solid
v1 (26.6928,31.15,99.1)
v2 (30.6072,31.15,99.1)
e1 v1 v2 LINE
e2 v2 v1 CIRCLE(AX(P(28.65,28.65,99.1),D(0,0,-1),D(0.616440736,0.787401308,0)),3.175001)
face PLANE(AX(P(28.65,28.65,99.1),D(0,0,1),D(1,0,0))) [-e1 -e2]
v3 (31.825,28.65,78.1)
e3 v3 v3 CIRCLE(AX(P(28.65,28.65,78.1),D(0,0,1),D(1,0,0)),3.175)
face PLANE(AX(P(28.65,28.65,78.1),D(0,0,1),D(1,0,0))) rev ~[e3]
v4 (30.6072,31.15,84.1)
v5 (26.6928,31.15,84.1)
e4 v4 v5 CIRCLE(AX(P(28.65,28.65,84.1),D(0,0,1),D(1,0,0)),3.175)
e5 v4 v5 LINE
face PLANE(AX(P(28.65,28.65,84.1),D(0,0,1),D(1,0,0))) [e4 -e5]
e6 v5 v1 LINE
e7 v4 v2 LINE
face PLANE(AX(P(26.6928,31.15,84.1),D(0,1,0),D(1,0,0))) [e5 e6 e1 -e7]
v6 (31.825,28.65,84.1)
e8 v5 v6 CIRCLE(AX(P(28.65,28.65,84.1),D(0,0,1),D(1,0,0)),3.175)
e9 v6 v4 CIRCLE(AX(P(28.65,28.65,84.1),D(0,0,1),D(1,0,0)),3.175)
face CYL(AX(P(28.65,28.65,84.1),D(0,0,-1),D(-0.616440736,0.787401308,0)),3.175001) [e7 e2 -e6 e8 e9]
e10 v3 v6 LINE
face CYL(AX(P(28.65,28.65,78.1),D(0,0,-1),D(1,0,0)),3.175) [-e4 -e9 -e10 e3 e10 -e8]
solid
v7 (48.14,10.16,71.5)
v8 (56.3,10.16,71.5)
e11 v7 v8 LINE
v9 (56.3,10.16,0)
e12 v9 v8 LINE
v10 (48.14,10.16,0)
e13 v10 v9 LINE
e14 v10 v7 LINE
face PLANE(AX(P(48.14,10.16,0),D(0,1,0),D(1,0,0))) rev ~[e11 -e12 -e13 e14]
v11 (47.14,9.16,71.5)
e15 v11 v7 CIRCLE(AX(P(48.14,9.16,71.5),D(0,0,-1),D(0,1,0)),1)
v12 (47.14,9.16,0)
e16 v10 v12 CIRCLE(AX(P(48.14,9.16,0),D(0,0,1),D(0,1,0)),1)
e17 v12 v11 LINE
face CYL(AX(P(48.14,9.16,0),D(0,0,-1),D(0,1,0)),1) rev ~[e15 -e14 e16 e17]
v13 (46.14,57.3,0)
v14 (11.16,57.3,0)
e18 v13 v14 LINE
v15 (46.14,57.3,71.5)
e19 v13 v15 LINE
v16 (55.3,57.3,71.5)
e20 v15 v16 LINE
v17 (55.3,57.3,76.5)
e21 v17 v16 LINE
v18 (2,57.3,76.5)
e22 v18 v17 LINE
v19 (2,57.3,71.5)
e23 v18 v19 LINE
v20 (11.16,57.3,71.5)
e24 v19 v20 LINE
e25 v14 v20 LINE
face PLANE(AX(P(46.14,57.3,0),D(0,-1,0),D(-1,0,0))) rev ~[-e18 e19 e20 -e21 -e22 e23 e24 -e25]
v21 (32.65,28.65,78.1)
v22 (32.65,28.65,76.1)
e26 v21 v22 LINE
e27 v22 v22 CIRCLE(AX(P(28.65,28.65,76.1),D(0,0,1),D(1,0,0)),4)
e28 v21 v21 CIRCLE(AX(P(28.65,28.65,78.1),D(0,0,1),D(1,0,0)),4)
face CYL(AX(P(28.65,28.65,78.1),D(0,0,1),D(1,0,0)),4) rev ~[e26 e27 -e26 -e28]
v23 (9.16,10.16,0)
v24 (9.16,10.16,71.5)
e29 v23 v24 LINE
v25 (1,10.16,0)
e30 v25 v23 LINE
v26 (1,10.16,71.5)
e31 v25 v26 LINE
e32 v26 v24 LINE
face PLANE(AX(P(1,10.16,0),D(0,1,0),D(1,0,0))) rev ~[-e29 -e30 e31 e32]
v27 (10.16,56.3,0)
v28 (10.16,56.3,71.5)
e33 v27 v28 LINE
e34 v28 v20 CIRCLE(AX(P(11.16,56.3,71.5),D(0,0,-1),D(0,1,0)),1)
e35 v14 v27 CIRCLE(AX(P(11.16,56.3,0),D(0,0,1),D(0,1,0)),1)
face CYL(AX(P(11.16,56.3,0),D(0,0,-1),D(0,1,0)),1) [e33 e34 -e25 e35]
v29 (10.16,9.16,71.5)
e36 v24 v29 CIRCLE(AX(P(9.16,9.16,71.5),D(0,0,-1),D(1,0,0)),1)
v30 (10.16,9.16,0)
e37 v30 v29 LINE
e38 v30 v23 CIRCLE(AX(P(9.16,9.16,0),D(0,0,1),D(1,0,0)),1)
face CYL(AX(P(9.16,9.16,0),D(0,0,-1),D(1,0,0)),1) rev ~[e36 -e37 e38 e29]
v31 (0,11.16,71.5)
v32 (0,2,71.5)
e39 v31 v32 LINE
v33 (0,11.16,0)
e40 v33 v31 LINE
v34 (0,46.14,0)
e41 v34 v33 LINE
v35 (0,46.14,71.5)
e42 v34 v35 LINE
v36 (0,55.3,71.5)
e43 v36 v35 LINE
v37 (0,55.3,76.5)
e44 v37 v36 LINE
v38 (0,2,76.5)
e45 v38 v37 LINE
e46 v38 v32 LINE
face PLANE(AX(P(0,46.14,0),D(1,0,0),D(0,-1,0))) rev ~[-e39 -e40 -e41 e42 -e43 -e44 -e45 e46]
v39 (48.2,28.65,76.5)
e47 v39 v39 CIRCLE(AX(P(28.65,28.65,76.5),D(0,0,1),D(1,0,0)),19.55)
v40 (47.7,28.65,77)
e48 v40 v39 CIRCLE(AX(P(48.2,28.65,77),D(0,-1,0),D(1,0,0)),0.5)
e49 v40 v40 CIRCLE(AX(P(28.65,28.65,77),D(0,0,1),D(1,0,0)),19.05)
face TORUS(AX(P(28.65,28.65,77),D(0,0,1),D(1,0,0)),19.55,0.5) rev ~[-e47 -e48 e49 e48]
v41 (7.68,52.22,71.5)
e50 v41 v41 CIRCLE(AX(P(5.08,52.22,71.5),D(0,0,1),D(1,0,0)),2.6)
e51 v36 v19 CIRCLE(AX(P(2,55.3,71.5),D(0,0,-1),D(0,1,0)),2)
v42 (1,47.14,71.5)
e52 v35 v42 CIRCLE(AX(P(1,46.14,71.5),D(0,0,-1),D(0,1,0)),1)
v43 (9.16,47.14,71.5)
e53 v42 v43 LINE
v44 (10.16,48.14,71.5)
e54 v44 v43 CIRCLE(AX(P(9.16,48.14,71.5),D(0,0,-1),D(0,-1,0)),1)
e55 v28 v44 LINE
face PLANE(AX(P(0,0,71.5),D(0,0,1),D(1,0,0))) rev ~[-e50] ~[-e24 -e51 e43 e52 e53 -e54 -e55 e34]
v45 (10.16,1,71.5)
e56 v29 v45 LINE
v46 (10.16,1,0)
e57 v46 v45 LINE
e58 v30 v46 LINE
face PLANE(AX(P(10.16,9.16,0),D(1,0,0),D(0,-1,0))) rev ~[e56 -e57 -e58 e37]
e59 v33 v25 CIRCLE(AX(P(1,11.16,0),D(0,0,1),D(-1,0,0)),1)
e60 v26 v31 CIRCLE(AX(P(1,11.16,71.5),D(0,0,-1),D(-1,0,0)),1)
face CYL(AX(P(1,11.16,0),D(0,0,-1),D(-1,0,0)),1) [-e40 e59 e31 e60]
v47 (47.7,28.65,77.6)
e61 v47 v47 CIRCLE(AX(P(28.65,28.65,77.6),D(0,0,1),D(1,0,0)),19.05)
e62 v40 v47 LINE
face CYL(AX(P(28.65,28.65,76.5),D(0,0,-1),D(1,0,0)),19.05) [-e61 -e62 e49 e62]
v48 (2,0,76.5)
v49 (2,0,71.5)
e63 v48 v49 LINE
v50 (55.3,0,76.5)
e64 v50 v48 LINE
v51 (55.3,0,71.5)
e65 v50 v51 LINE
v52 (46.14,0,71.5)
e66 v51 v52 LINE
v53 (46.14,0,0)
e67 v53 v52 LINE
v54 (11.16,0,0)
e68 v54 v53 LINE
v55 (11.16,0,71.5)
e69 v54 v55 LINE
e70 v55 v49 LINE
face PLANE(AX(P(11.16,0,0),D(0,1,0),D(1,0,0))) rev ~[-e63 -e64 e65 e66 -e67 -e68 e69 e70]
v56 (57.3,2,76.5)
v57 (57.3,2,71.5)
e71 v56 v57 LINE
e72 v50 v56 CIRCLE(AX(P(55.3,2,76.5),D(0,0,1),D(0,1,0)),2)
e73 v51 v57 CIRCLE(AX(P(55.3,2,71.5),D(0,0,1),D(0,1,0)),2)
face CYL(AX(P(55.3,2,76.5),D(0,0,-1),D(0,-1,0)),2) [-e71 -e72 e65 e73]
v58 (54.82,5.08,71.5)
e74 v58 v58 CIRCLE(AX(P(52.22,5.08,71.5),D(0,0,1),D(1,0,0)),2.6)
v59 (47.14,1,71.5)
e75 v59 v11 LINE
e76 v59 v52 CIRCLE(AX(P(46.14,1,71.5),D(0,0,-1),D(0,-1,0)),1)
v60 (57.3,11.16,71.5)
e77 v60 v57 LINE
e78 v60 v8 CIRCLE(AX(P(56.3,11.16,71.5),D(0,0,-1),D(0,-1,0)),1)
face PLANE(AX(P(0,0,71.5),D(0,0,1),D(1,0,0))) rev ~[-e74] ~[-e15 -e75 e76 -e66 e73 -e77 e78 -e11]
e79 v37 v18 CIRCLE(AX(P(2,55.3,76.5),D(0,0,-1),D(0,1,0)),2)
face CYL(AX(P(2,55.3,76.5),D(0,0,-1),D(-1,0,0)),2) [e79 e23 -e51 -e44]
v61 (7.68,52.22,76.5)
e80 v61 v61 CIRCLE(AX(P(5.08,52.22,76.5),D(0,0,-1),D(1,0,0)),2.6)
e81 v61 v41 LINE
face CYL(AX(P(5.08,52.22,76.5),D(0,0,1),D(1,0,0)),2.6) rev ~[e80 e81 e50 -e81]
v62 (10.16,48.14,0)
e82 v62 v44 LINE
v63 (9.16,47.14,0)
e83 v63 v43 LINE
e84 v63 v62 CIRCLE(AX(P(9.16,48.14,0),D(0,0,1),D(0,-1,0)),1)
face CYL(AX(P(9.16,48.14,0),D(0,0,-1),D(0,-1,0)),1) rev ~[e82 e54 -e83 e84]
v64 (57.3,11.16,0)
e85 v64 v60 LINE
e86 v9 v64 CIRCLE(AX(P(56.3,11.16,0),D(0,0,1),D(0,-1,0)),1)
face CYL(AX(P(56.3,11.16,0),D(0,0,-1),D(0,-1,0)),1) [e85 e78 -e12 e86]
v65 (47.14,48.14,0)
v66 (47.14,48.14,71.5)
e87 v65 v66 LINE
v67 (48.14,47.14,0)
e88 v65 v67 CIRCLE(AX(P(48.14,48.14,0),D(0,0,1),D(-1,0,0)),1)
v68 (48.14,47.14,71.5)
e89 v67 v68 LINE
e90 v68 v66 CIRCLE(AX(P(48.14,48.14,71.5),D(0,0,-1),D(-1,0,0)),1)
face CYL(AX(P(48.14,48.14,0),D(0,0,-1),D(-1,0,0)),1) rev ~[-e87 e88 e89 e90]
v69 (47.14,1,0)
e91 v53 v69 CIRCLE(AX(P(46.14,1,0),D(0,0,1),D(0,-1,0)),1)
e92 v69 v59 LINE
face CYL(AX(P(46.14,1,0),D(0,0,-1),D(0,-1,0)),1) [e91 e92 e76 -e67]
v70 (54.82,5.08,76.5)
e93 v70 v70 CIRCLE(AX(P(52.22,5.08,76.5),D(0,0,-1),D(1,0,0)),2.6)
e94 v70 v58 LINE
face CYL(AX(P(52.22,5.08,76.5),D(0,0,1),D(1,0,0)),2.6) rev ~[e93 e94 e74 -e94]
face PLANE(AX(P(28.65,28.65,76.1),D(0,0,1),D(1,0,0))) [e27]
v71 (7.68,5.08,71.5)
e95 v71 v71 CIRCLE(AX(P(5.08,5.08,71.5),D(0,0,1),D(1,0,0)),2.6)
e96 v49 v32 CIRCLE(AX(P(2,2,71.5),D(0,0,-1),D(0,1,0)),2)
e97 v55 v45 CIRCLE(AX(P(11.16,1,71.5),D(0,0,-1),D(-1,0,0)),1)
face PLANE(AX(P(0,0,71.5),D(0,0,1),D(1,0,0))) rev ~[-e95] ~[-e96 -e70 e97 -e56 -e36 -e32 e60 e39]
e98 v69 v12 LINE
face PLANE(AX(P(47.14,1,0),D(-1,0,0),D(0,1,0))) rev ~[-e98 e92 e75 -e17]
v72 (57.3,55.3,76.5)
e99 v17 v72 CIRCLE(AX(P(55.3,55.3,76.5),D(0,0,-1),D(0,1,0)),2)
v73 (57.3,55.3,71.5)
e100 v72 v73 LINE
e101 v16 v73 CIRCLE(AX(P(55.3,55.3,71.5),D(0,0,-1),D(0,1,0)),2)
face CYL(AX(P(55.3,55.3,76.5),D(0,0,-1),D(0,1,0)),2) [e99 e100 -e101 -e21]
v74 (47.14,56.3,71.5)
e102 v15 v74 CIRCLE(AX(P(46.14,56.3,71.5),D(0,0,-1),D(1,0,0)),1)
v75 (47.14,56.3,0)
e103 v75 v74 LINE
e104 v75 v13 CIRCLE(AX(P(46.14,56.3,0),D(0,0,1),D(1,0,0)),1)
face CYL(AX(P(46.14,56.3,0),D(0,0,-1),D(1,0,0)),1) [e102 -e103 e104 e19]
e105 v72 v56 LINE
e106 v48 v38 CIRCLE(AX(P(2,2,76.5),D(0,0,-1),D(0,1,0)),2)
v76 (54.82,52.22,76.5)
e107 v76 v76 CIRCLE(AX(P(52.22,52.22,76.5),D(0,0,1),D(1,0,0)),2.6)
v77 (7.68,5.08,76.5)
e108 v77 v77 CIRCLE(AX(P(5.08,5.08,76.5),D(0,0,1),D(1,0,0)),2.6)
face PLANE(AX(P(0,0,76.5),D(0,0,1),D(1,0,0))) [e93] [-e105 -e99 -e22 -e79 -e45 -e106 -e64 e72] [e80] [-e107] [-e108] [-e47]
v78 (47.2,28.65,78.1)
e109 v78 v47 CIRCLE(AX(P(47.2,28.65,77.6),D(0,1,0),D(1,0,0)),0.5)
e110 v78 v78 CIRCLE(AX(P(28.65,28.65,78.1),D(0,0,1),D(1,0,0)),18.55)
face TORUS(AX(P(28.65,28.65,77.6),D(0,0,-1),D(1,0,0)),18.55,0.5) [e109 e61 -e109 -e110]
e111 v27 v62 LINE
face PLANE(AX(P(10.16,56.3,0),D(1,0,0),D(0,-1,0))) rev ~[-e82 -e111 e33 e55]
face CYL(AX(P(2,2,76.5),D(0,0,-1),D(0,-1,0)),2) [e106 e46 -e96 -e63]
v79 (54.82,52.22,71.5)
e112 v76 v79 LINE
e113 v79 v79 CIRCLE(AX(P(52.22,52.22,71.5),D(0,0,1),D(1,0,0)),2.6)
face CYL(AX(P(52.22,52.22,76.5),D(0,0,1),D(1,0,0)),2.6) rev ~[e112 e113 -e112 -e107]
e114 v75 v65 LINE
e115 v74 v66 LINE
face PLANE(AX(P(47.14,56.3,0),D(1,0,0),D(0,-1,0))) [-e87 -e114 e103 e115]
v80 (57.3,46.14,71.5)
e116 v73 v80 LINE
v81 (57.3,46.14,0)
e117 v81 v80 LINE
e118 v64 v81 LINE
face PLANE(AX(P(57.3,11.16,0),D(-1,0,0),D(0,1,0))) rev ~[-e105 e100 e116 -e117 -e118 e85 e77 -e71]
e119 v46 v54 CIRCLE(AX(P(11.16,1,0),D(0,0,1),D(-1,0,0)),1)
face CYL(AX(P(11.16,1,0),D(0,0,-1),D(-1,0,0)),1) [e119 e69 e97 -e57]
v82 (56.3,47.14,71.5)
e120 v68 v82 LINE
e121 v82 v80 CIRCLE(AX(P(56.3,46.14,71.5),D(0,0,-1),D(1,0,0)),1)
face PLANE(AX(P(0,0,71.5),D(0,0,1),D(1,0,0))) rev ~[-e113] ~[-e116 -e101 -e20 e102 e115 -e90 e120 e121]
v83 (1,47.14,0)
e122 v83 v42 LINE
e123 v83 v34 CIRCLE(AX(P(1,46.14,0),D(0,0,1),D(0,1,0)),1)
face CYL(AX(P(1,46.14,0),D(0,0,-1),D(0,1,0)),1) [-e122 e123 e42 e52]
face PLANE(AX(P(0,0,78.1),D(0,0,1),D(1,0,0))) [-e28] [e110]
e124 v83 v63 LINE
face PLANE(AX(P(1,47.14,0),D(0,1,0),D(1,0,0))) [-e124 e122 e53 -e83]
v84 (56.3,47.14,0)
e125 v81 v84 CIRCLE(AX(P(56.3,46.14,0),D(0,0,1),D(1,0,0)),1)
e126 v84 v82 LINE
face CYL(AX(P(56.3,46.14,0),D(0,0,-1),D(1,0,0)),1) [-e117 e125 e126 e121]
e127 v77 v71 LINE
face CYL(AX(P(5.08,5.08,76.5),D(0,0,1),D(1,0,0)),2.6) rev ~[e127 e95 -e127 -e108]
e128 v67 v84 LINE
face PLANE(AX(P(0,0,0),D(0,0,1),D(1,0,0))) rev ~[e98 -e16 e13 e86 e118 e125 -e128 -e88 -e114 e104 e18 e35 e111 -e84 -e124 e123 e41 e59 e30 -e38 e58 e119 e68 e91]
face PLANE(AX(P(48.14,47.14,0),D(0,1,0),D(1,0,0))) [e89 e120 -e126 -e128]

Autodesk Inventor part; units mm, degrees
ref_plane "YZ Plane" through (0, 0, 0) normal (1, 0, 0) x (0, 1, 0)
ref_plane "XZ Plane" through (0, 0, 0) normal (0, 1, 0) x (-1, 0, 0)
ref_plane "XY Plane" through (0, 0, 0) normal (0, 0, 1) x (1, 0, 0)
sketch "Sketch1" plane through (0, 0, 0) normal (0, 0, 1) x (1, 0, 0)
  line L0 (11.16, 0) -> (46.14, 0)
  line L1 (57.3, 11.16) -> (57.3, 46.14)
  line L2 (46.14, 57.3) -> (11.16, 57.3)
  line L3 (0, 46.14) -> (0, 11.16)
  line L4 (0, 0) -> (0, 10.16)
  line L5 (1, 10.16) -> (9.16, 10.16)
  line L6 (10.16, 9.16) -> (10.16, 1)
  line L7 (57.3, 0) -> (47.14, 0)
  line L8 (47.14, 1) -> (47.14, 9.16)
  line L9 (48.14, 10.16) -> (56.3, 10.16)
  line L10 (47.14, 56.3) -> (47.14, 48.14)
  line L11 (48.14, 47.14) -> (56.3, 47.14)
  line L12 (10.16, 56.3) -> (10.16, 48.14)
  line L13 (1, 47.14) -> (9.16, 47.14)
  arc A0 (9.16, 47.14) -> (10.16, 48.14) centre (9.16, 48.14) ccw
  arc A1 (47.14, 48.14) -> (48.14, 47.14) centre (48.14, 48.14) ccw
  arc A2 (10.16, 9.16) -> (9.16, 10.16) centre (9.16, 9.16) ccw
  arc A3 (48.14, 10.16) -> (47.14, 9.16) centre (48.14, 9.16) ccw
  arc A4 (11.16, 57.3) -> (10.16, 56.3) centre (11.16, 56.3) ccw
  arc A5 (47.14, 56.3) -> (46.14, 57.3) centre (46.14, 56.3) ccw
  arc A6 (57.3, 46.14) -> (56.3, 47.14) centre (56.3, 46.14) ccw
  arc A7 (56.3, 10.16) -> (57.3, 11.16) centre (56.3, 11.16) ccw
  arc A8 (46.14, 0) -> (47.14, 1) centre (46.14, 1) ccw
  arc A9 (10.16, 1) -> (11.16, 0) centre (11.16, 1) ccw
  arc A10 (0, 11.16) -> (1, 10.16) centre (1, 11.16) ccw
  arc A11 (1, 47.14) -> (0, 46.14) centre (1, 46.14) ccw
  point P0 (57.3, 57.3)
  point P1 (0, 47.14)
  point P2 (10.16, 10.16)
  point P3 (47.14, 10.16)
  point P4 (47.14, 47.14)
  point P5 (10.16, 47.14)
  point P6 (10.16, 57.3)
  point P7 (47.14, 57.3)
  point P8 (57.3, 10.16)
  dimension "d25" = 57.3
  dimension "d26" = 57.3
  dimension "d27" = 10.16
  dimension "d28" = 10.16
  dimension "d29" = 10.16
  dimension "d30" = 10.16
  dimension "d31" = 1
extrude "Extrusion4" add sketch "Sketch1" along normal blind 76.5
sketch "Sketch4" plane through (0, 0, 76.5) normal (0, 0, 1) x (1, 0, 0)
  arc A0 (10.16, 1) -> (11.16, 0) centre (11.16, 1) ccw projected
  line L0 (11.16, 0) -> (46.14, 0) projected
  arc A1 (46.14, 0) -> (47.14, 1) centre (46.14, 1) ccw projected
  line L1 (47.14, 1) -> (47.14, 9.16) projected
  arc A2 (48.14, 10.16) -> (47.14, 9.16) centre (48.14, 9.16) ccw projected
  line L2 (48.14, 10.16) -> (56.3, 10.16) projected
  arc A3 (56.3, 10.16) -> (57.3, 11.16) centre (56.3, 11.16) ccw projected
  line L3 (57.3, 11.16) -> (57.3, 46.14) projected
  arc A4 (57.3, 46.14) -> (56.3, 47.14) centre (56.3, 46.14) ccw projected
  line L4 (56.3, 47.14) -> (48.14, 47.14) projected
  arc A5 (47.14, 48.14) -> (48.14, 47.14) centre (48.14, 48.14) ccw projected
  line L5 (47.14, 48.14) -> (47.14, 56.3) projected
  arc A6 (47.14, 56.3) -> (46.14, 57.3) centre (46.14, 56.3) ccw projected
  line L6 (46.14, 57.3) -> (11.16, 57.3) projected
  arc A7 (11.16, 57.3) -> (10.16, 56.3) centre (11.16, 56.3) ccw projected
  line L7 (10.16, 56.3) -> (10.16, 48.14) projected
  arc A8 (9.16, 47.14) -> (10.16, 48.14) centre (9.16, 48.14) ccw projected
  line L8 (9.16, 47.14) -> (1, 47.14) projected
  arc A9 (1, 47.14) -> (0, 46.14) centre (1, 46.14) ccw projected
  line L9 (0, 46.14) -> (0, 11.16) projected
  arc A10 (0, 11.16) -> (1, 10.16) centre (1, 11.16) ccw projected
  line L10 (1, 10.16) -> (9.16, 10.16) projected
  arc A11 (10.16, 9.16) -> (9.16, 10.16) centre (9.16, 9.16) ccw projected
  line L11 (10.16, 9.16) -> (10.16, 1) projected
  line L12 (0, 0) -> (57.3, 0)
  line L13 (57.3, 0) -> (57.3, 57.3)
  line L14 (57.3, 57.3) -> (0, 57.3)
  line L15 (0, 57.3) -> (0, 0)
  line L16 (0, 57.3) -> (5.08, 57.3)
  line L17 (5.08, 57.3) -> (5.08, 52.22)
  line L18 (57.3, 0) -> (52.22, 0)
  line L19 (52.22, 0) -> (52.22, 5.08)
  circle A12 centre (52.22, 52.22) radius 2.6
  circle A13 centre (5.08, 5.08) radius 2.6
  circle A14 centre (52.22, 5.08) radius 2.6
  circle A15 centre (5.08, 52.22) radius 2.6
  dimension "d34" = 5.08
  dimension "d35" = 5.08
  dimension "d36" = 5.08
  dimension "d37" = 5.08
  dimension "d38" = 5.2
  dimension "d39" = 5.2
  dimension "d40" = 5.2
  dimension "d41" = 5.2
extrude "Extrusion5" add sketch "Sketch4" against normal blind 5
fillet "Fillet1" radius 2 4 edges at (57.3, 57.3, 74) (57.3, 0, 74) (0, 57.3, 74) (0, 0, 74)
sketch "Sketch5" plane through (0, 0, 76.5) normal (0, 0, 1) x (1, 0, 0)
  arc A0 (0, 2) -> (2, 0) centre (2, 2) ccw projected
  line L0 (2, 0) -> (55.3, 0) projected
  arc A1 (55.3, 0) -> (57.3, 2) centre (55.3, 2) ccw projected
  line L1 (57.3, 2) -> (57.3, 55.3) projected
  arc A2 (57.3, 55.3) -> (55.3, 57.3) centre (55.3, 55.3) ccw projected
  line L2 (55.3, 57.3) -> (2, 57.3) projected
  arc A3 (2, 57.3) -> (0, 55.3) centre (2, 55.3) ccw projected
  line L3 (0, 55.3) -> (0, 2) projected
  circle A4 centre (52.22, 52.22) radius 2.6 projected
  circle A5 centre (5.08, 52.22) radius 2.6 projected
  circle A6 centre (52.22, 5.08) radius 2.6 projected
  circle A7 centre (5.08, 5.08) radius 2.6 projected
  circle A8 centre (28.65, 28.65) radius 19.05
  point P0 (0, 0)
  dimension "d45" = 38.1
extrude "Extrusion6" add sketch "Sketch5" along normal blind 1.6 contours A8
sketch "Sketch6" plane through (28.65, 28.65, 78.1) normal (0, 0, 1) x (1, 0, 0)
  circle A0 centre (0, 0) radius 3.175
  point P0 (-28.65, -28.65)
  dimension "d48" = 6.35
extrude "Extrusion7" add sketch "Sketch6" along normal blind 6
sketch "Sketch7" plane through (28.65, 28.65, 84.1) normal (0, 0, 1) x (1, 0, 0)
  arc A0 (-1.9572, 2.5) -> (1.9572, 2.5) centre (0, 0) ccw
  circle A1 centre (0, 0) radius 3.175 projected
  line L0 (0, 0) -> (0, 2.5)
  line L1 (-1.9572, 2.5) -> (1.9572, 2.5)
  point P0 (-28.65, -28.65)
  dimension "d51" = 2.5
extrude "Extrusion8" add sketch "Sketch7" along normal blind 15 contours L1 A0
sketch "Sketch8" plane through (28.65, 28.65, 78.1) normal (0, 0, 1) x (1, 0, 0)
  circle A0 centre (0, 0) radius 3.175
  circle A1 centre (0, 0) radius 4
  point P0 (-28.65, -28.65)
  dimension "d54" = 8
extrude "Extrusion9" cut sketch "Sketch8" against normal blind 2 contours A0 | A1
fillet "Fillet2" radius 0.5 2 edges at (9.6, 28.65, 78.1) (9.6, 28.65, 76.5)
properties part number "0x002" material "Iron, Cast"
